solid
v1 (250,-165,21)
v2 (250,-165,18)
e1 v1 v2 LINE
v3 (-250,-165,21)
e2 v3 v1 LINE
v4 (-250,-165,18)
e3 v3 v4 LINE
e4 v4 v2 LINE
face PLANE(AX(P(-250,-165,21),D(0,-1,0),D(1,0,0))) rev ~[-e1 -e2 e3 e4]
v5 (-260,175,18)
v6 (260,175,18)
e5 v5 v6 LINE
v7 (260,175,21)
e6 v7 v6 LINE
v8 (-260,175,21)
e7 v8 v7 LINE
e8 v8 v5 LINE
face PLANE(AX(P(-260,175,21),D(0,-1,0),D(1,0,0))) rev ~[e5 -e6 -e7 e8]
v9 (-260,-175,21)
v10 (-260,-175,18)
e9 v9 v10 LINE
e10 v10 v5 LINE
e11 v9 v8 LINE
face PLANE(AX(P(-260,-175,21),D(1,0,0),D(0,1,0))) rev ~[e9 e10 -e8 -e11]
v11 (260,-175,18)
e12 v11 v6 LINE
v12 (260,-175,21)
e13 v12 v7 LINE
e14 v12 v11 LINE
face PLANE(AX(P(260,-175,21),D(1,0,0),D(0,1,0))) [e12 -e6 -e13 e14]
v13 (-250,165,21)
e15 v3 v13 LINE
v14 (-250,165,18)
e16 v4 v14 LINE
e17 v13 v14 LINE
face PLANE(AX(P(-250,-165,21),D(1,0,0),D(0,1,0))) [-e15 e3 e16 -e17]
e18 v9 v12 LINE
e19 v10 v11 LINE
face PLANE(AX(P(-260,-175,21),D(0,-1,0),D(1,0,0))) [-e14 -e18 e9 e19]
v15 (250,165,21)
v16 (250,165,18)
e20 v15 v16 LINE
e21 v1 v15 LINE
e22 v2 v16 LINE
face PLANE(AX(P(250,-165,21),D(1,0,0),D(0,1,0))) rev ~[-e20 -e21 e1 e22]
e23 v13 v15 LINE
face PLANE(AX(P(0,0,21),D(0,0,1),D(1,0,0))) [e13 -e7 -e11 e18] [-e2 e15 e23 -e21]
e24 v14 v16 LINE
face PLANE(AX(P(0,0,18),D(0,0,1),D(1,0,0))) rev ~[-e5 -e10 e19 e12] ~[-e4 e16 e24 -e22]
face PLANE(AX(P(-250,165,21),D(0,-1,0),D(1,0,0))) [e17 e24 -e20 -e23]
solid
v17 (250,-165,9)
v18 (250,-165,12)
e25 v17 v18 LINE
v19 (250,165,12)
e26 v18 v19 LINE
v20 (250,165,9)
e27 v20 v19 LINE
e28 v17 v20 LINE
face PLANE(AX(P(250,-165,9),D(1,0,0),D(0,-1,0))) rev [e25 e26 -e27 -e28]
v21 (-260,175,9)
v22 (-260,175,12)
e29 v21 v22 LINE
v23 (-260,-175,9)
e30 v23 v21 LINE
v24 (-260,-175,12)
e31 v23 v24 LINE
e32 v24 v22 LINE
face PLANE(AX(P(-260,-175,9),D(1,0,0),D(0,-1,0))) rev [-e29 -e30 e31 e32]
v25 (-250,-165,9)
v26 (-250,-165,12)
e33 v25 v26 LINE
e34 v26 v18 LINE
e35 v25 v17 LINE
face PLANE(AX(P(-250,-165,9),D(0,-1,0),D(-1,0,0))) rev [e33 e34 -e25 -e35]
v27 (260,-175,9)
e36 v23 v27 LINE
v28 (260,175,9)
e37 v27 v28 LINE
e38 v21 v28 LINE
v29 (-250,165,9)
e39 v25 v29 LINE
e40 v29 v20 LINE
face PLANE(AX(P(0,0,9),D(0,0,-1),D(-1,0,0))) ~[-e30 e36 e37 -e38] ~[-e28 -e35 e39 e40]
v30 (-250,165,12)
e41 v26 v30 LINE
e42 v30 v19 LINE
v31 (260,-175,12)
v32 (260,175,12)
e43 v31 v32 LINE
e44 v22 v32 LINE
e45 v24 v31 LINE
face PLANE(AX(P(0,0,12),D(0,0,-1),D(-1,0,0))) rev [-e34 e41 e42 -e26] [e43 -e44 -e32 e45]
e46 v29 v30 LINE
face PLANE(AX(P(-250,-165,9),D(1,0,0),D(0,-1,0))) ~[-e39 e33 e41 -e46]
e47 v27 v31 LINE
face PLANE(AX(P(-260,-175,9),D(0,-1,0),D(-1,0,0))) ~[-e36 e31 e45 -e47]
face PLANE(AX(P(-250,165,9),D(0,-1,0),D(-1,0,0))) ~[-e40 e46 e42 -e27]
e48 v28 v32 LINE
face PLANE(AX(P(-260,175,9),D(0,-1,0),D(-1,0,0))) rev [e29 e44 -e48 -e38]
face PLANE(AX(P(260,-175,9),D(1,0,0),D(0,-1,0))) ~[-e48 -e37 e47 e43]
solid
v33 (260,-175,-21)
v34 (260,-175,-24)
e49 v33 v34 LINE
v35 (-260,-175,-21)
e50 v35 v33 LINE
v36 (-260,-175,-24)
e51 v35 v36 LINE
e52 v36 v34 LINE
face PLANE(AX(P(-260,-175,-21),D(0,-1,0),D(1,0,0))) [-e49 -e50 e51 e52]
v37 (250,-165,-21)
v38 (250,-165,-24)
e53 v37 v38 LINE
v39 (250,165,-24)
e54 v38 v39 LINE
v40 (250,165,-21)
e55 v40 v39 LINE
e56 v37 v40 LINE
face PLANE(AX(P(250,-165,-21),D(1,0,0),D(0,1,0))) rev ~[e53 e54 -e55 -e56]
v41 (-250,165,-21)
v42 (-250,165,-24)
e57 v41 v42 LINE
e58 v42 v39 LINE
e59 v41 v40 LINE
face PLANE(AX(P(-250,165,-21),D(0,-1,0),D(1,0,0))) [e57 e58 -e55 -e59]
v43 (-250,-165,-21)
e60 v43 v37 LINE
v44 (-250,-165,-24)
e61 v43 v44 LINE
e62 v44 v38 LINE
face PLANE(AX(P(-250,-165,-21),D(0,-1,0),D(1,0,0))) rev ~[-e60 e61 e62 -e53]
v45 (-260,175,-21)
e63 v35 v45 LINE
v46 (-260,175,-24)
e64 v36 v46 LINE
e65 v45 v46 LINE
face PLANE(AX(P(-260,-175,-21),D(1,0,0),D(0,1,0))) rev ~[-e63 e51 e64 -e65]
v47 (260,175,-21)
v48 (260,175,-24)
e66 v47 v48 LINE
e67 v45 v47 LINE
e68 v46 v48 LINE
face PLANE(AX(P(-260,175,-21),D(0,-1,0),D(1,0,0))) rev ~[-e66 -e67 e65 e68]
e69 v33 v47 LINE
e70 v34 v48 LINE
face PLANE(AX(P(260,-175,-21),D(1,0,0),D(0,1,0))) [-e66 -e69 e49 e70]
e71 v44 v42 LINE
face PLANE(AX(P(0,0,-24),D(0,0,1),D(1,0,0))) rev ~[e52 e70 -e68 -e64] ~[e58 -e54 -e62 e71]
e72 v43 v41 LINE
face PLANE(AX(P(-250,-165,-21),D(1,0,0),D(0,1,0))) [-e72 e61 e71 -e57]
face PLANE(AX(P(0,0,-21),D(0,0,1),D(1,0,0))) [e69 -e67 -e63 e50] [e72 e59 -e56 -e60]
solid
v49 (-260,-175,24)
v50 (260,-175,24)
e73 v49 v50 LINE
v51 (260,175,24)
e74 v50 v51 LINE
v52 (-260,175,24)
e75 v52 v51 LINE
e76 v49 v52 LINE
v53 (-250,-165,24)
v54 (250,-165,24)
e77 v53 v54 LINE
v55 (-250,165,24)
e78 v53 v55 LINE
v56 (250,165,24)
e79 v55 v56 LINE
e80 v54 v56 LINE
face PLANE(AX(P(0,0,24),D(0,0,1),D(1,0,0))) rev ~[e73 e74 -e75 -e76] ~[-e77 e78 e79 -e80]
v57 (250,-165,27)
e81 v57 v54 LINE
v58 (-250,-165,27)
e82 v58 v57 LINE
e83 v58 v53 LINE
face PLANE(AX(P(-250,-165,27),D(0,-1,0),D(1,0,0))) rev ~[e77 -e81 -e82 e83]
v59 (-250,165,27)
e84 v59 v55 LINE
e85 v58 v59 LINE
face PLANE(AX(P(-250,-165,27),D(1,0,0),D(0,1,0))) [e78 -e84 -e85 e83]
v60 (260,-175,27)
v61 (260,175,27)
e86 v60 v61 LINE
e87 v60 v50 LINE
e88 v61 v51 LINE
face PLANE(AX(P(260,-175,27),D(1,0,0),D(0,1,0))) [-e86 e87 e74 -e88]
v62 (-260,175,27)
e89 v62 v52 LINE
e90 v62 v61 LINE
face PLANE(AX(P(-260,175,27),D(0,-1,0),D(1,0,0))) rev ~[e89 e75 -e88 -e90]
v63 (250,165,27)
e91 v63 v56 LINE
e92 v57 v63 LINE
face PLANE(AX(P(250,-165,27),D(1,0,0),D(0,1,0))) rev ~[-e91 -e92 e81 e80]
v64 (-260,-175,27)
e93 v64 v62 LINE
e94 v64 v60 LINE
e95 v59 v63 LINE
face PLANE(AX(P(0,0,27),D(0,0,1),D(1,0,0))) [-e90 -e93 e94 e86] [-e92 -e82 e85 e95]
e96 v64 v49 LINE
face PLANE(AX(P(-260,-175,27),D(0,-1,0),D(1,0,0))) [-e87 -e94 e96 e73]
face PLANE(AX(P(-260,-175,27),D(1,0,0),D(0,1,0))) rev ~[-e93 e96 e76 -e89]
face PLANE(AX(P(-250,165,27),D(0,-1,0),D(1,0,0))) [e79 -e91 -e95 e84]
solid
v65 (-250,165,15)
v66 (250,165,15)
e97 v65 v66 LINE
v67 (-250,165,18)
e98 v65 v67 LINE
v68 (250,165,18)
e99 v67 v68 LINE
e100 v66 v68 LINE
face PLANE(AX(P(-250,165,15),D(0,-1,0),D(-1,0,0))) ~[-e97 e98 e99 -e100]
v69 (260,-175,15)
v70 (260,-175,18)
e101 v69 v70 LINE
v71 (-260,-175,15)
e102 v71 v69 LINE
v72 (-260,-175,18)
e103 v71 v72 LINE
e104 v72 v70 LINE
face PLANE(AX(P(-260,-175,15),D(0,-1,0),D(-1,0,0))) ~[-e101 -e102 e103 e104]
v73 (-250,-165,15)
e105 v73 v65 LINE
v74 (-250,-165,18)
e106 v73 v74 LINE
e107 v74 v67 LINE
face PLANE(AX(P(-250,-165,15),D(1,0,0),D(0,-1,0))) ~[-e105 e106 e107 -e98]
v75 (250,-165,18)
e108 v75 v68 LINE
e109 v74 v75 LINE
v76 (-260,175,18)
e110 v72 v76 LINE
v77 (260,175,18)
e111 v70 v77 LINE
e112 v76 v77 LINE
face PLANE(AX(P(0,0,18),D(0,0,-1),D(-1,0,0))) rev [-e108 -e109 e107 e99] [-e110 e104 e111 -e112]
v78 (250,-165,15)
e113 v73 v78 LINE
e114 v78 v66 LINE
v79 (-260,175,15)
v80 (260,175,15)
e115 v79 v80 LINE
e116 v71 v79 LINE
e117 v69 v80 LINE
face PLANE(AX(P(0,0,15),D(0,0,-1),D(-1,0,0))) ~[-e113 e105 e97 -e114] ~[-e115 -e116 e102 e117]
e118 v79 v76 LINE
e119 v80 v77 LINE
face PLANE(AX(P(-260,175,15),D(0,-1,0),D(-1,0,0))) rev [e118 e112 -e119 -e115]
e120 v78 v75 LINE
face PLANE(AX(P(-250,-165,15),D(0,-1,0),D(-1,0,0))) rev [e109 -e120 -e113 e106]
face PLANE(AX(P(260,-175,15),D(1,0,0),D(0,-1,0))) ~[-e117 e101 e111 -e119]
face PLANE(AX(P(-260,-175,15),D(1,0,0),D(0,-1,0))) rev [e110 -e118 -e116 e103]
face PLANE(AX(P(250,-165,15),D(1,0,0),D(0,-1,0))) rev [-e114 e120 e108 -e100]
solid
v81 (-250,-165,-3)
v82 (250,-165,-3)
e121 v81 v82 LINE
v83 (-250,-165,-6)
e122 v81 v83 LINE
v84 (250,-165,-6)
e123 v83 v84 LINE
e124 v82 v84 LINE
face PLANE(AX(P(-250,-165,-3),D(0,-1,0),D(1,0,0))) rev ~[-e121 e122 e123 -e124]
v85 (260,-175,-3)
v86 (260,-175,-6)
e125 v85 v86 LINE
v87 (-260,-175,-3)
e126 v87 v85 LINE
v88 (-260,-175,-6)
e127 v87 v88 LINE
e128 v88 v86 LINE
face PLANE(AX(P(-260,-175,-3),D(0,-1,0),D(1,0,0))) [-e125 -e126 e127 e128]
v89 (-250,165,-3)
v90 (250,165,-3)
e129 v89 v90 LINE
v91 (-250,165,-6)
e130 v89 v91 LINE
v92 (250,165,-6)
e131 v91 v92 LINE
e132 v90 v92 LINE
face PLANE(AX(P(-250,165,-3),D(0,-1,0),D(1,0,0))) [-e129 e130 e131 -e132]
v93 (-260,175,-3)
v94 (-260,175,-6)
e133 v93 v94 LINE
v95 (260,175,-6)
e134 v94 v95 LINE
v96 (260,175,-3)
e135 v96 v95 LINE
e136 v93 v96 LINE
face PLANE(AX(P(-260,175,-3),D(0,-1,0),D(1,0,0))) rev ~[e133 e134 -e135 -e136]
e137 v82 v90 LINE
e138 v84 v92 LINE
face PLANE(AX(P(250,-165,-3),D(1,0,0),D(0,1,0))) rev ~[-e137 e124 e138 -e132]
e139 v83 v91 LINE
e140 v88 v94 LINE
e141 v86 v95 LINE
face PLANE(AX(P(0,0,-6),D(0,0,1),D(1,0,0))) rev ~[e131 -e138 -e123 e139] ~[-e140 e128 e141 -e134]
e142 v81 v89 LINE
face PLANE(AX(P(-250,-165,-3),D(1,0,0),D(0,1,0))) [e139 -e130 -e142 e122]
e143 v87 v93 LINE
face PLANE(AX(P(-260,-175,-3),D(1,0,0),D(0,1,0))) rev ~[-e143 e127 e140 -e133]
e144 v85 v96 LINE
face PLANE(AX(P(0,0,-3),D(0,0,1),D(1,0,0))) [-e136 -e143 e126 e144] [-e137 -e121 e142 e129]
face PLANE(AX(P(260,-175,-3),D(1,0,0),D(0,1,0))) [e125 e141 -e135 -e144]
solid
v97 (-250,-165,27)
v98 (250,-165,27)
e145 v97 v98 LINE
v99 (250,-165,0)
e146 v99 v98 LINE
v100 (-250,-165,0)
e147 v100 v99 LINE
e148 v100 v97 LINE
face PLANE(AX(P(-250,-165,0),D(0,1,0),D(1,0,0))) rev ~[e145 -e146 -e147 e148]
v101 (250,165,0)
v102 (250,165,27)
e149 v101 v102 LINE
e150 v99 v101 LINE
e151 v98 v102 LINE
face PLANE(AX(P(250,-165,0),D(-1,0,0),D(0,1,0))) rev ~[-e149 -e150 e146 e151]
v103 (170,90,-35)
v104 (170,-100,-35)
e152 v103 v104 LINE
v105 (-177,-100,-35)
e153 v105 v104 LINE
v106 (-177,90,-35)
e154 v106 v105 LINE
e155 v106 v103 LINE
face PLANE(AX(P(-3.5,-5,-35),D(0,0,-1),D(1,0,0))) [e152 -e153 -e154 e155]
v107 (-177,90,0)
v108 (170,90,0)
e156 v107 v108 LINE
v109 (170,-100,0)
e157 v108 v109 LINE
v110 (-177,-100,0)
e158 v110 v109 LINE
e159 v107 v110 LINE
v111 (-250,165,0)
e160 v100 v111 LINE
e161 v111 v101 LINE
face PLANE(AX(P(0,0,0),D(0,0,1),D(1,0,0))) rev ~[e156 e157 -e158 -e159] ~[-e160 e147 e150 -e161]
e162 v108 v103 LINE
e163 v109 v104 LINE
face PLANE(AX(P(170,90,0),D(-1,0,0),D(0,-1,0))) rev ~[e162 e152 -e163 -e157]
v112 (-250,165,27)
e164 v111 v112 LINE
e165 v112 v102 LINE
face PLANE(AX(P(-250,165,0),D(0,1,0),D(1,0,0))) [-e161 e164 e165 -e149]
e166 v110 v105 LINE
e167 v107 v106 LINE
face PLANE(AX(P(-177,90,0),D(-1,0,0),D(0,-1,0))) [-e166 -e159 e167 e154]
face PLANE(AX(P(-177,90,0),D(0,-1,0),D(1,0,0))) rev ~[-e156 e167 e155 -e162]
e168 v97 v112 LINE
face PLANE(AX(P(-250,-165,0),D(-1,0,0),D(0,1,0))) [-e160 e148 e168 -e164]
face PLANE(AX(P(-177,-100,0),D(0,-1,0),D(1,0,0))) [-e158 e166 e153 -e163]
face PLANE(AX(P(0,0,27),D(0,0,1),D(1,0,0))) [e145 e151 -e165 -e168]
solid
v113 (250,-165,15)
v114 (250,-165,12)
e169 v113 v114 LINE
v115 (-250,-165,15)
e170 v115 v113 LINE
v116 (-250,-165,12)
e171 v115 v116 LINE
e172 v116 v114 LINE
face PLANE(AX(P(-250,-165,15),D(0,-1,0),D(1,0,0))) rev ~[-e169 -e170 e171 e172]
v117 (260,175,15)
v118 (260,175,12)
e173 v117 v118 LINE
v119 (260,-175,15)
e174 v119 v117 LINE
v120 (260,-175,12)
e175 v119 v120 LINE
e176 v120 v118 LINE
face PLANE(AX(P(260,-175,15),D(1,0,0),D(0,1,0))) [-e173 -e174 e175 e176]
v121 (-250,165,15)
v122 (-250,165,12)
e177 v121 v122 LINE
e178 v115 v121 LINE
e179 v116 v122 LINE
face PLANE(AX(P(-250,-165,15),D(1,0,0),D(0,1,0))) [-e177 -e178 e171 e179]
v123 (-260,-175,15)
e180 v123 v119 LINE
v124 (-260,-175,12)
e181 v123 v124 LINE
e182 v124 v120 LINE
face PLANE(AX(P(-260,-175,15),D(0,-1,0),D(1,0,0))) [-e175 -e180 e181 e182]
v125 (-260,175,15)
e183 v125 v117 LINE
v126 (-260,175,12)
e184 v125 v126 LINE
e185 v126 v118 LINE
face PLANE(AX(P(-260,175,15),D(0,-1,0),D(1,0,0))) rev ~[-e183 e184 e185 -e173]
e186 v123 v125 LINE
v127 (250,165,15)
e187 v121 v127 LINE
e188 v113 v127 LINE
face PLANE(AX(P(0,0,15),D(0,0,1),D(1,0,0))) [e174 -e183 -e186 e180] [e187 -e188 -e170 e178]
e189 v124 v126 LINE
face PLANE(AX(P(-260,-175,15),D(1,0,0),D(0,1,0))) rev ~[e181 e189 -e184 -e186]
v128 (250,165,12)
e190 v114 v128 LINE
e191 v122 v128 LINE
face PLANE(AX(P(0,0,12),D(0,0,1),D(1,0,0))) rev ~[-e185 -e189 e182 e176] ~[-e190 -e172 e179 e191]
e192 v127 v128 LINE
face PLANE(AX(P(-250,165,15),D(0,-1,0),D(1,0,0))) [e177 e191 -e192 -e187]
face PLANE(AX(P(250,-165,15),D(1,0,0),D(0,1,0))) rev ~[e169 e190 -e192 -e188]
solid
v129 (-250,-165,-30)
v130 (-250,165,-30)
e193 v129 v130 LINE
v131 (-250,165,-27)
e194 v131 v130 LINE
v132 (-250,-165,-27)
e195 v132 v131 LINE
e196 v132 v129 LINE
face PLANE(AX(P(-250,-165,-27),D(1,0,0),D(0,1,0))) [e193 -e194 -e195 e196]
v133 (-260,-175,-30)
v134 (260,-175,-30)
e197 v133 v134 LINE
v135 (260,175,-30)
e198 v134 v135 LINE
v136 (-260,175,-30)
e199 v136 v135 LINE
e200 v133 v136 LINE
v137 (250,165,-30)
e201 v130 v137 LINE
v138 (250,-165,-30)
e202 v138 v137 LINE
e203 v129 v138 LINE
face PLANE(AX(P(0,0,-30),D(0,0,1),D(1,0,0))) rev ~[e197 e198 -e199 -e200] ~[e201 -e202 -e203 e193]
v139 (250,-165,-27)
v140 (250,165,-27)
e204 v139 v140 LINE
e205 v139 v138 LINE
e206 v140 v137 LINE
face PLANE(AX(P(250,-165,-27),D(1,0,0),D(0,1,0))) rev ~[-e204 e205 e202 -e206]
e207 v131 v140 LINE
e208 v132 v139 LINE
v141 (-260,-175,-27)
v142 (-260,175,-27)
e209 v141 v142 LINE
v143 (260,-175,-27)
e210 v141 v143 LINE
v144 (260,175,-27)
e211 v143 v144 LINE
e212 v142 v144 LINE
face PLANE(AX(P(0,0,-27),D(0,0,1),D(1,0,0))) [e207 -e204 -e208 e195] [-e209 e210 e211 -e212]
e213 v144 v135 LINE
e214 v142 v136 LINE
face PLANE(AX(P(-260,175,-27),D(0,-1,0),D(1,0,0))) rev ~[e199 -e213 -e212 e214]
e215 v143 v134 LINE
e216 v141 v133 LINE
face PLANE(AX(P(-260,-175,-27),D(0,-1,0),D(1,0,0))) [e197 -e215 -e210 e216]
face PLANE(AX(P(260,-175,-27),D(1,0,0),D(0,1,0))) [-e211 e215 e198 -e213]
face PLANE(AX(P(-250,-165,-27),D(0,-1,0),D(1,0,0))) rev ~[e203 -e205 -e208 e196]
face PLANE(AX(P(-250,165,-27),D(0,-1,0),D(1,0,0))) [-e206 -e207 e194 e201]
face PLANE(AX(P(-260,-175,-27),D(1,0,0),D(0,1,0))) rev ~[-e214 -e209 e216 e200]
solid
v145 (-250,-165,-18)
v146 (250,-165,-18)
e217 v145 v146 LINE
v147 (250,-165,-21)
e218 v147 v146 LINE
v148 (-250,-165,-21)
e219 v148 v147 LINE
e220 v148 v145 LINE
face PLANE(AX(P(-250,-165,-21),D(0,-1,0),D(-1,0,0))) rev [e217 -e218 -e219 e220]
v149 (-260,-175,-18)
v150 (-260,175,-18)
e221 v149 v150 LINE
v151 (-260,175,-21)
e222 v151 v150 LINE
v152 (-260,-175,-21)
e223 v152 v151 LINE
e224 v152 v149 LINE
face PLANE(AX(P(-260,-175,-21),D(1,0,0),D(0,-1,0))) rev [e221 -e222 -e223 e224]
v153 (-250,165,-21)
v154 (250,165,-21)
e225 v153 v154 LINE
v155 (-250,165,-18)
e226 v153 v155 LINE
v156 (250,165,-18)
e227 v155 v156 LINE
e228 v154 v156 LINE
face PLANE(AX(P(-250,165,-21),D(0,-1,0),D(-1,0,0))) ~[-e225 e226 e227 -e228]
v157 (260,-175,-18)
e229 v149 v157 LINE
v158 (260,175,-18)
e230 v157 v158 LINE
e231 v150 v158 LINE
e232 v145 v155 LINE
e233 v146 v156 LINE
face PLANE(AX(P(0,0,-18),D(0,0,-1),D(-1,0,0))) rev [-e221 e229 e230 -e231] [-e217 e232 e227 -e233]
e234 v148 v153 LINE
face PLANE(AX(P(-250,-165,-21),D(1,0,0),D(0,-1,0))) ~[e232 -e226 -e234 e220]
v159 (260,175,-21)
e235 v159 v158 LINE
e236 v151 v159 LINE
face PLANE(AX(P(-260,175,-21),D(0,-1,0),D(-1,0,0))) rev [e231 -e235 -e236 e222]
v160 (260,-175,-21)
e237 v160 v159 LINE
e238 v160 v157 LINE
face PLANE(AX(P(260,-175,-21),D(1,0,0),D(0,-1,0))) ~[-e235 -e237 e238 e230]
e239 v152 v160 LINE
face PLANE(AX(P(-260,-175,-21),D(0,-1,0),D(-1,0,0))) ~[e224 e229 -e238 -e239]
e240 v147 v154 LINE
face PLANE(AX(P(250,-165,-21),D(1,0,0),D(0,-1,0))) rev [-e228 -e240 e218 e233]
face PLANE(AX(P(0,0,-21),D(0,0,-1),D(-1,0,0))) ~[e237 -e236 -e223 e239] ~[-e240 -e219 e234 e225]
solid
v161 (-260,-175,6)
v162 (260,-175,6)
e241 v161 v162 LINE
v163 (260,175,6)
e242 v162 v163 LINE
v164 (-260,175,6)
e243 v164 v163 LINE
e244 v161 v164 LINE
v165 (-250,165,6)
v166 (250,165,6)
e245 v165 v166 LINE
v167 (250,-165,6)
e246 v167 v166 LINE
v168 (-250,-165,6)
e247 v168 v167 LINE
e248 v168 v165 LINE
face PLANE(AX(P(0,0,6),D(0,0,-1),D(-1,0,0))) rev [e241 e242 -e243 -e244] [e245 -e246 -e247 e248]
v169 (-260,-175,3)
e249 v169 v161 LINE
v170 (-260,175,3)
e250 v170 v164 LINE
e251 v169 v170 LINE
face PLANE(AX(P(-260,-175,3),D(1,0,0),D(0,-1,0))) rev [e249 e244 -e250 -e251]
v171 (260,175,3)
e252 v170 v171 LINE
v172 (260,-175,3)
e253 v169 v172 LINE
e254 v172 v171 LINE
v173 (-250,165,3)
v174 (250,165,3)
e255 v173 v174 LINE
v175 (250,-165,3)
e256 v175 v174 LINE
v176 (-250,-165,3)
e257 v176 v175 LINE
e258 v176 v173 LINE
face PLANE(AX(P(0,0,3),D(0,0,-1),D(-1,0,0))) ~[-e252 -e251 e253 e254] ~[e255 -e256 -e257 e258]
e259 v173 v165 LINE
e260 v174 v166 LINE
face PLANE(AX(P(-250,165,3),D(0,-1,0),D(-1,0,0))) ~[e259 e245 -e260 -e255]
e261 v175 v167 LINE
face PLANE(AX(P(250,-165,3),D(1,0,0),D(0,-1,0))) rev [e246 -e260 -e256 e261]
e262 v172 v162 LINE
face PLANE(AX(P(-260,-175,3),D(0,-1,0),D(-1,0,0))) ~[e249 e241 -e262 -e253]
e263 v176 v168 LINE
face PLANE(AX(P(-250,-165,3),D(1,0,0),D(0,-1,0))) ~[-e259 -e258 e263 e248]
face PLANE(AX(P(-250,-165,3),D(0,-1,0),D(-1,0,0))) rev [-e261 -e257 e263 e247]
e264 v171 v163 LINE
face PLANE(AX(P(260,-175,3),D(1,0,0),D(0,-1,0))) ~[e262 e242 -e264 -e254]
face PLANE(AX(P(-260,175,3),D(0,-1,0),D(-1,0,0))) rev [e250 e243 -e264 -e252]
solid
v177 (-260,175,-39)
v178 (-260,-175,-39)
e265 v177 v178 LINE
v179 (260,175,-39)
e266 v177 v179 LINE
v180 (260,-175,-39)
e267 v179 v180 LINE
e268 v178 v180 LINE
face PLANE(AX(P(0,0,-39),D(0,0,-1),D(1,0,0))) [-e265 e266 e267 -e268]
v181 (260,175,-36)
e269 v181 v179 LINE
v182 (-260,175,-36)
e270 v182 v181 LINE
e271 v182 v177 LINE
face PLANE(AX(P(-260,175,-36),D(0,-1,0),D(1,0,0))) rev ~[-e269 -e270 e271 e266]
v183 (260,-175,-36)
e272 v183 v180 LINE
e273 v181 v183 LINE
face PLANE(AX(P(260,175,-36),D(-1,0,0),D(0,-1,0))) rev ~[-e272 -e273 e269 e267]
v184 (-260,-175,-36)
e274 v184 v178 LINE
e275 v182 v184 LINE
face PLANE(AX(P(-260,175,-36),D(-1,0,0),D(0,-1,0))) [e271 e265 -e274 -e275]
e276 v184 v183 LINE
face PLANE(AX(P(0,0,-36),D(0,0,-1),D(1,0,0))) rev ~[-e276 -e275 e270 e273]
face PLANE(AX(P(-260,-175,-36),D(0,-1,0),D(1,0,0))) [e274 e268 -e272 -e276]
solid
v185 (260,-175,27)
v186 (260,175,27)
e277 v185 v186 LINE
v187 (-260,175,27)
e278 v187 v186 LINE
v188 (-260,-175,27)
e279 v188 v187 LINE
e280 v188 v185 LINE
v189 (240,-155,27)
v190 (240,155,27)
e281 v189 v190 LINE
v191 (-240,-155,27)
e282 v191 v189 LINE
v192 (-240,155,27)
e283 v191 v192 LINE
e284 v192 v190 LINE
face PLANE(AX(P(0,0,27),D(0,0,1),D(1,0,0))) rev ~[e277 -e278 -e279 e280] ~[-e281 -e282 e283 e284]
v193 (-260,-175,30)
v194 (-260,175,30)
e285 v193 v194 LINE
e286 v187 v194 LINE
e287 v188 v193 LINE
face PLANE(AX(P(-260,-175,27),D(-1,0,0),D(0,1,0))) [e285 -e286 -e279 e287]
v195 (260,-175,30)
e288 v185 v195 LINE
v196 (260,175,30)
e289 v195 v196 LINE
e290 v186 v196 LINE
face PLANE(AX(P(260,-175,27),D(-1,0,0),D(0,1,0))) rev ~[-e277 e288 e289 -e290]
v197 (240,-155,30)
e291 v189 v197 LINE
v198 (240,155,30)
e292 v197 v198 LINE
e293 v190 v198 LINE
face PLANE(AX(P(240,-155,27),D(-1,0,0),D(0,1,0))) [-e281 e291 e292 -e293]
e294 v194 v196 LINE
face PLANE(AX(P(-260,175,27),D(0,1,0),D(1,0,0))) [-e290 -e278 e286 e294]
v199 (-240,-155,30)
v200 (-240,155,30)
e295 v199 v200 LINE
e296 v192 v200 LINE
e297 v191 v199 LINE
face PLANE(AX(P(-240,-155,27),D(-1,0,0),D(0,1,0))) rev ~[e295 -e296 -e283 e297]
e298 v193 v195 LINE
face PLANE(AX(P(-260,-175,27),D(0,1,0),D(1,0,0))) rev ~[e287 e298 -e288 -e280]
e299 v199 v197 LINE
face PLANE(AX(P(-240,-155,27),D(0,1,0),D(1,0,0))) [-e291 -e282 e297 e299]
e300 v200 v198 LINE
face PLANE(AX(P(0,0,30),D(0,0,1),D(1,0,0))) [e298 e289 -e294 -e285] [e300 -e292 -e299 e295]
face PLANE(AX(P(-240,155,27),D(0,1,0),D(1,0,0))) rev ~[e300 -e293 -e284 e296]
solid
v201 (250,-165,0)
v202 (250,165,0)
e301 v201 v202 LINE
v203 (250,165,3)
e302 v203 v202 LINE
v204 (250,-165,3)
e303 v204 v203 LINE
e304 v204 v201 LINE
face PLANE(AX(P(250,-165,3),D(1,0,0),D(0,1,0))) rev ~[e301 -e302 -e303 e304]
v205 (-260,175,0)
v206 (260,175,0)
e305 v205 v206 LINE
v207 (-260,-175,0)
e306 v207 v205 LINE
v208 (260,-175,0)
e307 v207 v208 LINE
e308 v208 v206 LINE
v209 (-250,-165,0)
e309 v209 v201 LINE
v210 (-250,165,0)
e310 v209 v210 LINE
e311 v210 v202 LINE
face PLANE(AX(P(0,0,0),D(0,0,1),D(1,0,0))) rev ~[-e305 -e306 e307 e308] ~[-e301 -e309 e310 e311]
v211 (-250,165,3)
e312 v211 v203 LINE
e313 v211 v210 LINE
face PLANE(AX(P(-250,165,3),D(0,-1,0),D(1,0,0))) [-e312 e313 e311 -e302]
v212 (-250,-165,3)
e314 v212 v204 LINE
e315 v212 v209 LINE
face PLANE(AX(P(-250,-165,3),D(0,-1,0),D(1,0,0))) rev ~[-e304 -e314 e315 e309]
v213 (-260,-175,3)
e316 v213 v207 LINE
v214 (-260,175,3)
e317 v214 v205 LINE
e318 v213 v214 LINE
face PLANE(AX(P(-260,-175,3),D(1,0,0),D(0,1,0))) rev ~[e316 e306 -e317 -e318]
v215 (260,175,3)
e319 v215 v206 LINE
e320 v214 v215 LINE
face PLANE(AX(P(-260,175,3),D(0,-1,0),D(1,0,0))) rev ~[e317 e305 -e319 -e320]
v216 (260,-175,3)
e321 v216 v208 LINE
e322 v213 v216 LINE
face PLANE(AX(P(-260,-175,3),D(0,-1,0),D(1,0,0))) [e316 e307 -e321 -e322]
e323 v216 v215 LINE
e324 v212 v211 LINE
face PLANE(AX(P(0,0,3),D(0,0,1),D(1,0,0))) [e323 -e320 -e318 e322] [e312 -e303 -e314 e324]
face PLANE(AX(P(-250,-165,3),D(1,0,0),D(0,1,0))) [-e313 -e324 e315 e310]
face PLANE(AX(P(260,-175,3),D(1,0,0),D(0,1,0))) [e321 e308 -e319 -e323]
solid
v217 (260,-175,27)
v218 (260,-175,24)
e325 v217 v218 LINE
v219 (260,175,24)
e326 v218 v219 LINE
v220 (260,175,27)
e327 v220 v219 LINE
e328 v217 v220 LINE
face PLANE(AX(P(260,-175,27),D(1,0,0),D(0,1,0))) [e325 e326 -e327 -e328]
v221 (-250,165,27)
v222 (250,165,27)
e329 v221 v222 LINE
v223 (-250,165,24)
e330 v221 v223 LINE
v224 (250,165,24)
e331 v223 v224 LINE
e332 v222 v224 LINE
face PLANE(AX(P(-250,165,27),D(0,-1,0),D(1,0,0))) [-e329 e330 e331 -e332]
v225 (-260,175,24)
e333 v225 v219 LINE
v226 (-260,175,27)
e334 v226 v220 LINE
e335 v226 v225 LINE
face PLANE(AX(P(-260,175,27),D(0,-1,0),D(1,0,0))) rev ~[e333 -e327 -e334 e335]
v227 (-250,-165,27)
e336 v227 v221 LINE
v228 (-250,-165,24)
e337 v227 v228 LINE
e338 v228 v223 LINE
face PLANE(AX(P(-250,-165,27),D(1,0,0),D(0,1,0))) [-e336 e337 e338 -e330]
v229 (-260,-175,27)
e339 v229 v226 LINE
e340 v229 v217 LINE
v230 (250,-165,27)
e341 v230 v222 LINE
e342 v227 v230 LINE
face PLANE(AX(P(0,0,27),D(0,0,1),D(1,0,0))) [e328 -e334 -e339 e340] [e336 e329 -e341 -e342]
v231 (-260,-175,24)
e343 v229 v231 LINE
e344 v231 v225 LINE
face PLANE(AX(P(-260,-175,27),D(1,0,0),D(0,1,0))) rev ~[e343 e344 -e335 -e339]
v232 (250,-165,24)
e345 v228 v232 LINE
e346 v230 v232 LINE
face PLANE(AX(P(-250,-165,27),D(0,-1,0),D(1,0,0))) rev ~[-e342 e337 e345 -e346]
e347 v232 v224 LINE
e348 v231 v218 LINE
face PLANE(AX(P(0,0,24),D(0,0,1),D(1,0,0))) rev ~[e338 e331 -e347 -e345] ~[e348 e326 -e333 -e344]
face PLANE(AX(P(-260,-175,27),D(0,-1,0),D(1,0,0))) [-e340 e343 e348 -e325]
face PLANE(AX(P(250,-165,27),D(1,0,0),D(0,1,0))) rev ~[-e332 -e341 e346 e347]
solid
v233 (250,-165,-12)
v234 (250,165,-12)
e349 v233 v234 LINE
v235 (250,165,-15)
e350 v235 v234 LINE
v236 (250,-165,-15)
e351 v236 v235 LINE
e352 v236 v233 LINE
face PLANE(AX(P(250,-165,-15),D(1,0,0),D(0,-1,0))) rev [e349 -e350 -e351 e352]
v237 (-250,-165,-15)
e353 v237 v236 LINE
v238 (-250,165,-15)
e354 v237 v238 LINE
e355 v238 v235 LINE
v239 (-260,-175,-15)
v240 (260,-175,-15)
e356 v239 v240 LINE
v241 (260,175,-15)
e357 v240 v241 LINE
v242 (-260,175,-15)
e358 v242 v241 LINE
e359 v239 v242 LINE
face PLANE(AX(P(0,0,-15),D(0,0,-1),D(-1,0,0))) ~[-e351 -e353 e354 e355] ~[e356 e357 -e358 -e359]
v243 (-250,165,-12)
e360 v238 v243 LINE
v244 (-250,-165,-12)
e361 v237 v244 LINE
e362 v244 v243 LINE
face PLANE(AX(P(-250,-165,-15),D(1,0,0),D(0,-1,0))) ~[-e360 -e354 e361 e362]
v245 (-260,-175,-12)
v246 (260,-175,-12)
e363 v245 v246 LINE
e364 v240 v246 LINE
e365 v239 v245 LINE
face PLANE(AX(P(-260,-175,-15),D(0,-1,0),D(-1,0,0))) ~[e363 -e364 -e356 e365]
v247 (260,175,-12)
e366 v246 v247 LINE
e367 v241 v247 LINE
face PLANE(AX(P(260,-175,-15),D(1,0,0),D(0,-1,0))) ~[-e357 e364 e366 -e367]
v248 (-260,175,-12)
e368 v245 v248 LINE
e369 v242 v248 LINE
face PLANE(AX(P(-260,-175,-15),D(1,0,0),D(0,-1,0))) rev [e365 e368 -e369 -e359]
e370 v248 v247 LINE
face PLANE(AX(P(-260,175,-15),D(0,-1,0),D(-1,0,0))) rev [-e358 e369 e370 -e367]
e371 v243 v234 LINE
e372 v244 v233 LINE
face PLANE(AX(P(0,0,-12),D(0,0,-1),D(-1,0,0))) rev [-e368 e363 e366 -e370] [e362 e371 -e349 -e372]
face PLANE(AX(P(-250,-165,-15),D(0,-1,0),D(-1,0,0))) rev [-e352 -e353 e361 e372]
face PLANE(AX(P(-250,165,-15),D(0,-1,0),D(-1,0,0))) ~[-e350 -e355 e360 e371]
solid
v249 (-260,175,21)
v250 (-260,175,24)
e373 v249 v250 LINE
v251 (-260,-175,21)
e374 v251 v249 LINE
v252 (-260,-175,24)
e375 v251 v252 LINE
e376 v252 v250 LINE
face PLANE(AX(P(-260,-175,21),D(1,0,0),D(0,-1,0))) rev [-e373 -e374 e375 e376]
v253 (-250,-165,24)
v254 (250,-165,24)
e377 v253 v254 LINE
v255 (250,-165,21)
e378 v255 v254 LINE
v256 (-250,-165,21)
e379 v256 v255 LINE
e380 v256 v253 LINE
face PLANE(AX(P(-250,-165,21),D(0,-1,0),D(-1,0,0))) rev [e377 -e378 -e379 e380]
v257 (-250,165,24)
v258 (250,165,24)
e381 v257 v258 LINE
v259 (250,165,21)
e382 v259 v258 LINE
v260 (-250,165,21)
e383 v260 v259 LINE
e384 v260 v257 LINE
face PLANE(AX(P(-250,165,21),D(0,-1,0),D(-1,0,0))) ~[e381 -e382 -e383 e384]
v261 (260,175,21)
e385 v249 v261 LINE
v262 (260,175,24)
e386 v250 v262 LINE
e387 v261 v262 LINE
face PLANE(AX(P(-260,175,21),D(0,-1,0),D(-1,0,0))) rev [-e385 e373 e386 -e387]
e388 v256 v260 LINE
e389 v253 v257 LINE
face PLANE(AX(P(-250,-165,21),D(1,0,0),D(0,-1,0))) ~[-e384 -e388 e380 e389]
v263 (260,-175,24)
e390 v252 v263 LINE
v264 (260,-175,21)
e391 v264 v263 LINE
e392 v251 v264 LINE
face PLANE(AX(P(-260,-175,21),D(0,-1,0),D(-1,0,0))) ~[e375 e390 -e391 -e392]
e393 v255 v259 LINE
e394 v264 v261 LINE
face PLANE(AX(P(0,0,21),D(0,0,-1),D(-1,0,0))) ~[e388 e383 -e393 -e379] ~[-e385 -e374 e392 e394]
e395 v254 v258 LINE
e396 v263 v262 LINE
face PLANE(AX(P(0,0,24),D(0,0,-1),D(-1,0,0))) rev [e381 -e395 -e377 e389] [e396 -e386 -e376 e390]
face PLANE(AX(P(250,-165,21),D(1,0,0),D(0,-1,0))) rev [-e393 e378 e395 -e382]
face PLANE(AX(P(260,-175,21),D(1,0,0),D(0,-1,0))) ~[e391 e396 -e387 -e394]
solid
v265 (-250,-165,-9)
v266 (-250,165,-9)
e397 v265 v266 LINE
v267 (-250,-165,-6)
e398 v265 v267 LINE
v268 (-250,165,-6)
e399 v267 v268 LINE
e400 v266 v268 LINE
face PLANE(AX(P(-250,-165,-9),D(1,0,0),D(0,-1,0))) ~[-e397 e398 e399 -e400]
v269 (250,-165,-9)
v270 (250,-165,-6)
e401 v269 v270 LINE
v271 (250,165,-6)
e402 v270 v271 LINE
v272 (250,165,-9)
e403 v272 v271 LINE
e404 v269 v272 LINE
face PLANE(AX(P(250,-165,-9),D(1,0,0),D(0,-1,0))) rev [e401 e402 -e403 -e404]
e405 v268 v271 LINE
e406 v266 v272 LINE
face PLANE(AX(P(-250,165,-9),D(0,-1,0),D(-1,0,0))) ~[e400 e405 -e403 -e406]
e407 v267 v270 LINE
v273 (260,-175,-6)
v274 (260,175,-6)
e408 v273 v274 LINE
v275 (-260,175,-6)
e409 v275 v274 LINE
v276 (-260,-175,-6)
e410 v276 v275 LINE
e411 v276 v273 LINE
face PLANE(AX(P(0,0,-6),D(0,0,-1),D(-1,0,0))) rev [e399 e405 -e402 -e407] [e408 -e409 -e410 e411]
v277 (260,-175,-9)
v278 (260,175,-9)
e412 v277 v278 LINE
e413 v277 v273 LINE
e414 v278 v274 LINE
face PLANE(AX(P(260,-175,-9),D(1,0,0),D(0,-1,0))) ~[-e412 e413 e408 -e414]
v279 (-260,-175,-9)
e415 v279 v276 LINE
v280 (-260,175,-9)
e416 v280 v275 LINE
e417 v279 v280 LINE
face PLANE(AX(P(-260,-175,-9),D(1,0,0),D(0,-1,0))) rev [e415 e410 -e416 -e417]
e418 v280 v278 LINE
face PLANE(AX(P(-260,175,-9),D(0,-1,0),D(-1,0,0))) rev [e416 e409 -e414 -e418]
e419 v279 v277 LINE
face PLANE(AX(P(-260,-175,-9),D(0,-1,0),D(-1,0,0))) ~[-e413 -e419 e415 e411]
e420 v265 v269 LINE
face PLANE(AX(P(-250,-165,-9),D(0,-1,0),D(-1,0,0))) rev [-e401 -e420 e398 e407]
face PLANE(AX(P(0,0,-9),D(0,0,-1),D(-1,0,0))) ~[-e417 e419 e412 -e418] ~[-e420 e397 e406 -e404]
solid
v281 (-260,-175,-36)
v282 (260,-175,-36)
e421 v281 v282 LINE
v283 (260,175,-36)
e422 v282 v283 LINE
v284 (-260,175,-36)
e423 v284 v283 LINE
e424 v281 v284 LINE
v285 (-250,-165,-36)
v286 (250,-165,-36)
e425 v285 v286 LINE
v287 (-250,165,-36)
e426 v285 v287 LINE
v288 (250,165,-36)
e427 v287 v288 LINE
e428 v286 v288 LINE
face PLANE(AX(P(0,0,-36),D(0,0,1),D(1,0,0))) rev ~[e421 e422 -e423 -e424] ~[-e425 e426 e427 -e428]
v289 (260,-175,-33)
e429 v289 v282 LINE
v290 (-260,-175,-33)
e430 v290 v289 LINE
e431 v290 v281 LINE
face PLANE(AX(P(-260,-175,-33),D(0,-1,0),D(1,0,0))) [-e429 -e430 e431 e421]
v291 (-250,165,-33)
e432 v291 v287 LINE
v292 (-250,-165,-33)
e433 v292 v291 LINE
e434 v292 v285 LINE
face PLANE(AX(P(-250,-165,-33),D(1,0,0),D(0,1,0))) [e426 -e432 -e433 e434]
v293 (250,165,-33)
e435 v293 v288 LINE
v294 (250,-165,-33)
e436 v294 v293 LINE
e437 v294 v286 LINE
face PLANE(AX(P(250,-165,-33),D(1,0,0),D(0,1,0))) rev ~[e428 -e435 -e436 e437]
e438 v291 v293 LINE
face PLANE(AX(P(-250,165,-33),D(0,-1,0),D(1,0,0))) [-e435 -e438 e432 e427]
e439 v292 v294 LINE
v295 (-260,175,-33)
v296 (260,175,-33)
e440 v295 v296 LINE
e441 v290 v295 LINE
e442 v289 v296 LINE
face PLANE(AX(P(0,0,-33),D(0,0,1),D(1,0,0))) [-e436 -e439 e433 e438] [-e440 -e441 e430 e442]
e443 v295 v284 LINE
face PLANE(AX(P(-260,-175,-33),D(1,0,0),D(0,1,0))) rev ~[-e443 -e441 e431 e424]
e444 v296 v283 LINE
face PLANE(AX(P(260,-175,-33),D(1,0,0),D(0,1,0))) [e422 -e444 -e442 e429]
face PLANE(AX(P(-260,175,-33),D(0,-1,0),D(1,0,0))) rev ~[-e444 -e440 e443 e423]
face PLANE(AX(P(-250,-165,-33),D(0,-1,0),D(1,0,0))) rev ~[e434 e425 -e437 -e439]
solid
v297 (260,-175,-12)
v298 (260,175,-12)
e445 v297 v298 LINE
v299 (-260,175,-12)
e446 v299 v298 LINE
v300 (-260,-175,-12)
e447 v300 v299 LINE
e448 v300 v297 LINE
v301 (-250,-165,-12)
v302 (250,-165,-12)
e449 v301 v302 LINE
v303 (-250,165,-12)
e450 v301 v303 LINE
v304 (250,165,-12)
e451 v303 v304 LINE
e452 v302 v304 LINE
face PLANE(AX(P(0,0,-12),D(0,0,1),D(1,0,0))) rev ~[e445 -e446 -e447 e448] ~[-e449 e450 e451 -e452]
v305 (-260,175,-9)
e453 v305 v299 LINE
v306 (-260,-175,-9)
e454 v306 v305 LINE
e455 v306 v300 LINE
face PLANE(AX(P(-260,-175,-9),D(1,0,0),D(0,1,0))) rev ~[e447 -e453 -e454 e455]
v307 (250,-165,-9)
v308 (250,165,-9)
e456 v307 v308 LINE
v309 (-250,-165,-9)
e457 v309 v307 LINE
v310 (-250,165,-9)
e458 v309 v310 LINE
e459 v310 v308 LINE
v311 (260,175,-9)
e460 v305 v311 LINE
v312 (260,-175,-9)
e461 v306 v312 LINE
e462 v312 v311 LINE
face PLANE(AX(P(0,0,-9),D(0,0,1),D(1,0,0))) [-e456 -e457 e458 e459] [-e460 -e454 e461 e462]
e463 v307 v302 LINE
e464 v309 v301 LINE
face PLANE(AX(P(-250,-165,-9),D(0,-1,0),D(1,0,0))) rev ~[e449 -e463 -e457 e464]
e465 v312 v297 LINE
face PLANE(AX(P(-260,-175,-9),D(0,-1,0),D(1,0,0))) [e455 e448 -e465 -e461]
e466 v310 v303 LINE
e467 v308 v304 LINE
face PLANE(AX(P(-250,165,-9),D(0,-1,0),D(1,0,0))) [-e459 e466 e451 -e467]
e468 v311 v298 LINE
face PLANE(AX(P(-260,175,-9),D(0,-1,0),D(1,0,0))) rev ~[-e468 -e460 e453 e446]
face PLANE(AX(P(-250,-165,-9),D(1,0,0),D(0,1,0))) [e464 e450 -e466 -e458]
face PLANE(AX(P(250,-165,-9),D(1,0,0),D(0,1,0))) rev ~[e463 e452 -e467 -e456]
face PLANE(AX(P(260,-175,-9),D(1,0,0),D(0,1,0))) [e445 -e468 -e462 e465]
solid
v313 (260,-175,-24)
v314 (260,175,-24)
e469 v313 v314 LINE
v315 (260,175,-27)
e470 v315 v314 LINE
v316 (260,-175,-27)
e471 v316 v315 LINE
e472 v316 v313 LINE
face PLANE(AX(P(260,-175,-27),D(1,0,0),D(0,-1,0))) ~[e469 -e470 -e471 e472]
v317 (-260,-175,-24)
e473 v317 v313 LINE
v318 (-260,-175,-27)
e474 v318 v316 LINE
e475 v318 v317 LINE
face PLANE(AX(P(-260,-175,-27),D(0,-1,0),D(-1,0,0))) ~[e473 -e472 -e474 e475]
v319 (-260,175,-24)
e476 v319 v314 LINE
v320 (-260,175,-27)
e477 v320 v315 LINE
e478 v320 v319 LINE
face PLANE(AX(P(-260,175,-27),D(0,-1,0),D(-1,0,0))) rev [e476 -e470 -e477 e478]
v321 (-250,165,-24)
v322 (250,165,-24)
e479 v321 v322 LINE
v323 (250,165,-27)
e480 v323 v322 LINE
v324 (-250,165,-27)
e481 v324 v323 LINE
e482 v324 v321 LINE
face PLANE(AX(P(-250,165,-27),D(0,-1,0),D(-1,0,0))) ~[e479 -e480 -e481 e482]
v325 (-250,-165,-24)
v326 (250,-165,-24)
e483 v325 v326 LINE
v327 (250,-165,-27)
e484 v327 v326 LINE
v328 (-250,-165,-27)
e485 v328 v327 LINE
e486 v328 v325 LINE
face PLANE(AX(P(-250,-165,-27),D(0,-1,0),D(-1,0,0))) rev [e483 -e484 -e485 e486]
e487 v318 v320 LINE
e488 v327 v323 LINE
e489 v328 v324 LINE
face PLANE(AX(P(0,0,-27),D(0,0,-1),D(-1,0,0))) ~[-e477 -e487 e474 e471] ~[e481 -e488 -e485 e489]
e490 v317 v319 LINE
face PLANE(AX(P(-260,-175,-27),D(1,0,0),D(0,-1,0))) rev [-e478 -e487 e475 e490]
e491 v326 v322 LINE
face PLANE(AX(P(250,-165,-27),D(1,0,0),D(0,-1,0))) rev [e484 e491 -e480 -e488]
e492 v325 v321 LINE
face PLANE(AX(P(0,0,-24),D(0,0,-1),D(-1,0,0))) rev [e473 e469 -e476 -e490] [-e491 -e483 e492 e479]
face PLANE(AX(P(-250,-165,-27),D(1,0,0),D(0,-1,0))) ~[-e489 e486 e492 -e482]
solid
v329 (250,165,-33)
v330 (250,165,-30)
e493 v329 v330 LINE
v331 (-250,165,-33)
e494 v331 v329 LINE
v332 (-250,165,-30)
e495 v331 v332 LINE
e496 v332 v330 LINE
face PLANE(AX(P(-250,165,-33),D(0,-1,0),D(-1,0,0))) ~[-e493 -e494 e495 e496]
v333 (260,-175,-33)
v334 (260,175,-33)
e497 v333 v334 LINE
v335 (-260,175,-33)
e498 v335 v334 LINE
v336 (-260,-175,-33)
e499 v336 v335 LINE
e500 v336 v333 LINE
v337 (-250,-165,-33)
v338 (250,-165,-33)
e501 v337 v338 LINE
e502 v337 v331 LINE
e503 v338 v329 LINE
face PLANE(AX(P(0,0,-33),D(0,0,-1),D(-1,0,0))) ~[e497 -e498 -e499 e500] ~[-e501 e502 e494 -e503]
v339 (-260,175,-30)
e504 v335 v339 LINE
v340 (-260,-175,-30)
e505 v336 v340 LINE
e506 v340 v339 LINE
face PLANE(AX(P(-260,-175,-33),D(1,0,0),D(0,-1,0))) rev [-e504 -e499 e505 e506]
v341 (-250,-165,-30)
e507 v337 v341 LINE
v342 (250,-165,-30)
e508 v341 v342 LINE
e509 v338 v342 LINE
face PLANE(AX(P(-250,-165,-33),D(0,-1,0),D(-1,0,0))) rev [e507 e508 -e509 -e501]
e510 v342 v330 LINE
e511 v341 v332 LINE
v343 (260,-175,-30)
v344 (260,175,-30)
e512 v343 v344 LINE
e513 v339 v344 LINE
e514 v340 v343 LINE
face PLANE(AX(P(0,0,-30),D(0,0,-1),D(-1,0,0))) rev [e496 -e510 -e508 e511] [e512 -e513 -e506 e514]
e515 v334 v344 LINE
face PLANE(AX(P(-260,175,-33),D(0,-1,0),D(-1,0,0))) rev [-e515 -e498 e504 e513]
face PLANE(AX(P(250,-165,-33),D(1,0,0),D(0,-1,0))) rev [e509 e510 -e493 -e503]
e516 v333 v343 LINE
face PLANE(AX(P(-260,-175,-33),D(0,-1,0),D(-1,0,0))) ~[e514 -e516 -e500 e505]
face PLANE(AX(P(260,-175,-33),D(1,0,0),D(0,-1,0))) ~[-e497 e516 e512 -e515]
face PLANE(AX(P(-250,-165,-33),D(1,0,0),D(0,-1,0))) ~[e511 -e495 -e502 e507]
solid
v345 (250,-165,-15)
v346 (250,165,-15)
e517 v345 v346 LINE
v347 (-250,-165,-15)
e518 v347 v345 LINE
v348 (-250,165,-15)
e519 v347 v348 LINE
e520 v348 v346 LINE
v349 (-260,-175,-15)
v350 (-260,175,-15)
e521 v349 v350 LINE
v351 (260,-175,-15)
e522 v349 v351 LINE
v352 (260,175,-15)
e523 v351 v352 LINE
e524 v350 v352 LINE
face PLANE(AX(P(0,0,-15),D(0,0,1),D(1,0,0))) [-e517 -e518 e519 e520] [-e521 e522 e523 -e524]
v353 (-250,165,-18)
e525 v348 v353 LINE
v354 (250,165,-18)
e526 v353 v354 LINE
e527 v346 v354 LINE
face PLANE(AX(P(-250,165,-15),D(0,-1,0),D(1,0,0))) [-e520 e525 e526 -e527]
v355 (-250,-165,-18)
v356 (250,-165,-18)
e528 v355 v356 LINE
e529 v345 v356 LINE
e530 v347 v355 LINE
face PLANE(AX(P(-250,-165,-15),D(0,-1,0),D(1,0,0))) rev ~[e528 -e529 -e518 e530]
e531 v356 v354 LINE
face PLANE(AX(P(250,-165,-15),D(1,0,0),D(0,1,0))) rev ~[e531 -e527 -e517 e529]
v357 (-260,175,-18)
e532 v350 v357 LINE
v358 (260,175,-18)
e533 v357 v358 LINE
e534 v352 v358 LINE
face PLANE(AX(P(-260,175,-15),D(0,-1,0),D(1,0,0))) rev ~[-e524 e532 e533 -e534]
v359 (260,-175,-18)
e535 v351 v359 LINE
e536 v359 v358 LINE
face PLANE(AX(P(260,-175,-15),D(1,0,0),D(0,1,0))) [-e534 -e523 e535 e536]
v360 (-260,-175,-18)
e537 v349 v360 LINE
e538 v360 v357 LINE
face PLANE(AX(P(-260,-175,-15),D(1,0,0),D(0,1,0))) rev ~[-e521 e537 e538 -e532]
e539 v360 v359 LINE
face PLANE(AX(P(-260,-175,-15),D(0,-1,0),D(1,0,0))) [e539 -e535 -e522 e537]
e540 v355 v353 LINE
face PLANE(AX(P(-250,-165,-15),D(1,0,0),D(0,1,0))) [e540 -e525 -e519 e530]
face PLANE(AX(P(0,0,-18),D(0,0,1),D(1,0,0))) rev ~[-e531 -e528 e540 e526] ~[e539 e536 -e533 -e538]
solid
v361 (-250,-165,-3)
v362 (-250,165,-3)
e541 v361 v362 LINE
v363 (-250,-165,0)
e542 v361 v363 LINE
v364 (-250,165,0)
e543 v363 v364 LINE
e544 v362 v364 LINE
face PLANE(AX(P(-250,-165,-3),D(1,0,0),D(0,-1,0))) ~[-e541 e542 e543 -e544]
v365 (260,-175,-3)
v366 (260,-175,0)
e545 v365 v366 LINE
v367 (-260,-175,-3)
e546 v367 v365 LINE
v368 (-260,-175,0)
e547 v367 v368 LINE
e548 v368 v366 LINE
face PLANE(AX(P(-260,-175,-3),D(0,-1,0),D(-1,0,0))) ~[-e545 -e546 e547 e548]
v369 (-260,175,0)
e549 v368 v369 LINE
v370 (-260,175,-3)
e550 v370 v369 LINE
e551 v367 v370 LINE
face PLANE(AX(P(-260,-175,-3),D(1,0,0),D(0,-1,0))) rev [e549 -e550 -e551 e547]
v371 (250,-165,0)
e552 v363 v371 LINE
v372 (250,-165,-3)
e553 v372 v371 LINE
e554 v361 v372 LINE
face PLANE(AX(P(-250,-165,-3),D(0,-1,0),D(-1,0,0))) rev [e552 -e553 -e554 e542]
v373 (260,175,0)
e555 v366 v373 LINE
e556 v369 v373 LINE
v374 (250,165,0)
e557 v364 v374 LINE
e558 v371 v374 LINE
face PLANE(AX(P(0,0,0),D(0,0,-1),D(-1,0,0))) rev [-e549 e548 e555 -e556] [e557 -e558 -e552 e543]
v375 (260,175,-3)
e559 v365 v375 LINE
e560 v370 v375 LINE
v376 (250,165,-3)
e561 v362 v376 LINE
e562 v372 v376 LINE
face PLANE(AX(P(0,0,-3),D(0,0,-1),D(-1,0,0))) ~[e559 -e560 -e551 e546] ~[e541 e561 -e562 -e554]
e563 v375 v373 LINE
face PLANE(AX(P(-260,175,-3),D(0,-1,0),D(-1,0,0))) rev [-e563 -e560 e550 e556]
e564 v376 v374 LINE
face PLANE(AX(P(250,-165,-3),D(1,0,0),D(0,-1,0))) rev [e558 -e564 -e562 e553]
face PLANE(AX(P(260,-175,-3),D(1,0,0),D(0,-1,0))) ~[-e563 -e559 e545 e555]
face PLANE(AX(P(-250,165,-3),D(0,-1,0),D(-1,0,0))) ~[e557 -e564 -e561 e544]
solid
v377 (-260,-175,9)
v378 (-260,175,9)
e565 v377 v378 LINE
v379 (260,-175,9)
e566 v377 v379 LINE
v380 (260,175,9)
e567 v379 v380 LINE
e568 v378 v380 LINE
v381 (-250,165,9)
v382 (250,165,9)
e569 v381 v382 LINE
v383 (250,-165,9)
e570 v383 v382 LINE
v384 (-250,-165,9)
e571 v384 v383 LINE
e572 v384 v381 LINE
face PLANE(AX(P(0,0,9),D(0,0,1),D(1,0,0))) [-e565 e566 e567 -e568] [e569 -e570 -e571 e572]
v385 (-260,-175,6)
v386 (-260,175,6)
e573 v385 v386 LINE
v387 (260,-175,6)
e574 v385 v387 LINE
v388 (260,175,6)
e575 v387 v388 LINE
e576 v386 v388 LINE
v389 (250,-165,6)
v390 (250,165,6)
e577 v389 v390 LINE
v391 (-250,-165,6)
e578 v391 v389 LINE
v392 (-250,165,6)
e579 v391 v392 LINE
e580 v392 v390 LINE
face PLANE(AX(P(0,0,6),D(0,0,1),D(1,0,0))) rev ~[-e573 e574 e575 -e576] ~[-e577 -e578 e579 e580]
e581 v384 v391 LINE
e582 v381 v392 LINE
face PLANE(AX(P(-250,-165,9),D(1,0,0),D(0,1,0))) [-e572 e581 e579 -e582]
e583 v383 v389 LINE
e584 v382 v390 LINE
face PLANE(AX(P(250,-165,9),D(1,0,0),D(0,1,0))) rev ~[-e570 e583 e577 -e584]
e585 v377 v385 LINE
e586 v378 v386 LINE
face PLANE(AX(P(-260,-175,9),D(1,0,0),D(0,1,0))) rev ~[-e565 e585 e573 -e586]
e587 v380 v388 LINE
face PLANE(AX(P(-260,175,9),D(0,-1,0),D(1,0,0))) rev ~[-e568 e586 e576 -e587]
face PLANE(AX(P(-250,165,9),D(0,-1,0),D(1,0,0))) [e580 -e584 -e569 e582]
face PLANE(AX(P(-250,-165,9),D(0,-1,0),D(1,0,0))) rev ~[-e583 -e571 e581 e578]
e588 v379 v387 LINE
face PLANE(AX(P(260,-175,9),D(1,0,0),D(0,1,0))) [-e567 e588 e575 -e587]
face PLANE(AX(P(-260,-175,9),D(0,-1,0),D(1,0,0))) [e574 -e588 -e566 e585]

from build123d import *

# Parameters (mm, degrees)
F0_W      = 500
F0_H      = 330
F1_DEPTH  = 27
F2_W      = 347
F2_H      = 190
F3_DEPTH  = 35
F4_W      = 520
F4_H      = 350
F4_W_2    = 500
F4_H_2    = 330
F4_W_3    = 480
F4_H_3    = 310
F5_DEPTH  = 3
F7_DEPTH  = 3
F6_W      = 520
F6_H      = 350
F6_W_2    = 500
F6_H_2    = 330
F15_W     = 520
F15_H     = 350
F16_DEPTH = 3


# Not quite as in the source:
# - a feature names something its author has since deleted; it is built from what else it names


with BuildPart() as f1:
    # F0 (on Top) → F1 (new body)
    with BuildSketch(Plane.XY):
        Rectangle(F0_W, F0_H)
    extrude(amount=F1_DEPTH)

    # F2 (on face) → F3 (join)
    with BuildSketch(Plane(origin=(0, 0, 0), x_dir=(1, 0, 0), z_dir=(0, 0, -1))):
        with Locations((-3.5, 5)):
            Rectangle(F2_W, F2_H)
    extrude(amount=F3_DEPTH)


with BuildPart() as f5:
    # F4 (on face) → F5 (new body)
    with BuildSketch(Plane.XY.offset(27)):
        Rectangle(F4_W, F4_H)
        Rectangle(F4_W_2, F4_H_2, mode=Mode.SUBTRACT)
        Rectangle(F4_W_2, F4_H_2)
        Rectangle(F4_W_3, F4_H_3, mode=Mode.SUBTRACT)
    extrude(amount=F5_DEPTH)


with BuildPart() as f7:
    # F4 (on face) → F7 (new body)
    with BuildSketch(Plane.XY.offset(27)):
        Rectangle(F4_W, F4_H)
        Rectangle(F4_W_2, F4_H_2, mode=Mode.SUBTRACT)
    extrude(amount=-F7_DEPTH)


with BuildPart() as f7b:
    # F6 (on face) → F7, piece 2 (new body)
    with BuildSketch(Plane.XY.offset(27)):
        Rectangle(F6_W, F6_H)
        Rectangle(F6_W_2, F6_H_2, mode=Mode.SUBTRACT)
    extrude(amount=-F7_DEPTH)


with BuildPart() as f8_1:
    # F8: instance of F7b
    add(f7b.part.mirror(Plane(origin=(0, 0, 24), x_dir=(1, 0, 0), z_dir=(0, 0, -1))))


with BuildPart() as f9_1:
    # F9: instance of F8_1
    add(f8_1.part.mirror(Plane(origin=(0, 0, 21), x_dir=(1, 0, 0), z_dir=(0, 0, -1))))


with BuildPart() as f9_2:
    # F9: instance of F7
    add(f7.part.mirror(Plane(origin=(0, 0, 21), x_dir=(1, 0, 0), z_dir=(0, 0, -1))))


with BuildPart() as f10_1:
    # F10: instance of F9_2
    add(f9_2.part.mirror(Plane(origin=(0, 0, 15), x_dir=(1, 0, 0), z_dir=(0, 0, -1))))


with BuildPart() as f10_2:
    # F10: instance of F9_1
    add(f9_1.part.mirror(Plane(origin=(0, 0, 15), x_dir=(1, 0, 0), z_dir=(0, 0, -1))))


with BuildPart() as f10_3:
    # F10: instance of F8_1
    add(f8_1.part.mirror(Plane(origin=(0, 0, 15), x_dir=(1, 0, 0), z_dir=(0, 0, -1))))


with BuildPart() as f10_4:
    # F10: instance of F7
    add(f7.part.mirror(Plane(origin=(0, 0, 15), x_dir=(1, 0, 0), z_dir=(0, 0, -1))))


with BuildPart() as f11_1:
    # F11: instance of F10_4
    add(f10_4.part.mirror(Plane(origin=(0, 0, 3), x_dir=(1, 0, 0), z_dir=(0, 0, -1))))


with BuildPart() as f11_2:
    # F11: instance of F10_3
    add(f10_3.part.mirror(Plane(origin=(0, 0, 3), x_dir=(1, 0, 0), z_dir=(0, 0, -1))))


with BuildPart() as f11_3:
    # F11: instance of F10_2
    add(f10_2.part.mirror(Plane(origin=(0, 0, 3), x_dir=(1, 0, 0), z_dir=(0, 0, -1))))


with BuildPart() as f11_4:
    # F11: instance of F10_1
    add(f10_1.part.mirror(Plane(origin=(0, 0, 3), x_dir=(1, 0, 0), z_dir=(0, 0, -1))))


with BuildPart() as f11_5:
    # F11: instance of F9_2
    add(f9_2.part.mirror(Plane(origin=(0, 0, 3), x_dir=(1, 0, 0), z_dir=(0, 0, -1))))


with BuildPart() as f11_6:
    # F11: instance of F9_1
    add(f9_1.part.mirror(Plane(origin=(0, 0, 3), x_dir=(1, 0, 0), z_dir=(0, 0, -1))))


with BuildPart() as f11_7:
    # F11: instance of F8_1
    add(f8_1.part.mirror(Plane(origin=(0, 0, 3), x_dir=(1, 0, 0), z_dir=(0, 0, -1))))


with BuildPart() as f11_8:
    # F11: instance of F7
    add(f7.part.mirror(Plane(origin=(0, 0, 3), x_dir=(1, 0, 0), z_dir=(0, 0, -1))))


with BuildPart() as f12_1:
    # F12: instance of F11_8
    add(f11_8.part.mirror(Plane(origin=(0, 0, -21), x_dir=(1, 0, 0), z_dir=(0, 0, -1))))


with BuildPart() as f12_2:
    # F12: instance of F11_7
    add(f11_7.part.mirror(Plane(origin=(0, 0, -21), x_dir=(1, 0, 0), z_dir=(0, 0, -1))))


with BuildPart() as f12_3:
    # F12: instance of F11_6
    add(f11_6.part.mirror(Plane(origin=(0, 0, -21), x_dir=(1, 0, 0), z_dir=(0, 0, -1))))


with BuildPart() as f12_4:
    # F12: instance of F11_5
    add(f11_5.part.mirror(Plane(origin=(0, 0, -21), x_dir=(1, 0, 0), z_dir=(0, 0, -1))))


with BuildPart() as f12_5:
    # F12: instance of F11_4
    add(f11_4.part.mirror(Plane(origin=(0, 0, -21), x_dir=(1, 0, 0), z_dir=(0, 0, -1))))


with BuildPart() as f12_6:
    # F12: instance of F11_3
    add(f11_3.part.mirror(Plane(origin=(0, 0, -21), x_dir=(1, 0, 0), z_dir=(0, 0, -1))))


with BuildPart() as f12_7:
    # F12: instance of F11_1
    add(f11_1.part.mirror(Plane(origin=(0, 0, -21), x_dir=(1, 0, 0), z_dir=(0, 0, -1))))


with BuildPart() as f16:
    # F15 (on face) → F16 (new body)
    with BuildSketch(Plane(origin=(0, 0, -36), x_dir=(1, 0, 0), z_dir=(0, 0, -1))):
        Rectangle(F15_W, F15_H)
    extrude(amount=F16_DEPTH)


solid = Compound([f1.part, f5.part, f7.part, f7b.part, f8_1.part, f9_1.part, f9_2.part, f10_1.part, f10_2.part, f10_3.part, f10_4.part, f11_1.part, f11_2.part, f11_3.part, f11_4.part, f11_5.part, f11_6.part, f11_7.part, f11_8.part, f12_1.part, f12_2.part, f12_3.part, f12_4.part, f12_5.part, f16.part])
